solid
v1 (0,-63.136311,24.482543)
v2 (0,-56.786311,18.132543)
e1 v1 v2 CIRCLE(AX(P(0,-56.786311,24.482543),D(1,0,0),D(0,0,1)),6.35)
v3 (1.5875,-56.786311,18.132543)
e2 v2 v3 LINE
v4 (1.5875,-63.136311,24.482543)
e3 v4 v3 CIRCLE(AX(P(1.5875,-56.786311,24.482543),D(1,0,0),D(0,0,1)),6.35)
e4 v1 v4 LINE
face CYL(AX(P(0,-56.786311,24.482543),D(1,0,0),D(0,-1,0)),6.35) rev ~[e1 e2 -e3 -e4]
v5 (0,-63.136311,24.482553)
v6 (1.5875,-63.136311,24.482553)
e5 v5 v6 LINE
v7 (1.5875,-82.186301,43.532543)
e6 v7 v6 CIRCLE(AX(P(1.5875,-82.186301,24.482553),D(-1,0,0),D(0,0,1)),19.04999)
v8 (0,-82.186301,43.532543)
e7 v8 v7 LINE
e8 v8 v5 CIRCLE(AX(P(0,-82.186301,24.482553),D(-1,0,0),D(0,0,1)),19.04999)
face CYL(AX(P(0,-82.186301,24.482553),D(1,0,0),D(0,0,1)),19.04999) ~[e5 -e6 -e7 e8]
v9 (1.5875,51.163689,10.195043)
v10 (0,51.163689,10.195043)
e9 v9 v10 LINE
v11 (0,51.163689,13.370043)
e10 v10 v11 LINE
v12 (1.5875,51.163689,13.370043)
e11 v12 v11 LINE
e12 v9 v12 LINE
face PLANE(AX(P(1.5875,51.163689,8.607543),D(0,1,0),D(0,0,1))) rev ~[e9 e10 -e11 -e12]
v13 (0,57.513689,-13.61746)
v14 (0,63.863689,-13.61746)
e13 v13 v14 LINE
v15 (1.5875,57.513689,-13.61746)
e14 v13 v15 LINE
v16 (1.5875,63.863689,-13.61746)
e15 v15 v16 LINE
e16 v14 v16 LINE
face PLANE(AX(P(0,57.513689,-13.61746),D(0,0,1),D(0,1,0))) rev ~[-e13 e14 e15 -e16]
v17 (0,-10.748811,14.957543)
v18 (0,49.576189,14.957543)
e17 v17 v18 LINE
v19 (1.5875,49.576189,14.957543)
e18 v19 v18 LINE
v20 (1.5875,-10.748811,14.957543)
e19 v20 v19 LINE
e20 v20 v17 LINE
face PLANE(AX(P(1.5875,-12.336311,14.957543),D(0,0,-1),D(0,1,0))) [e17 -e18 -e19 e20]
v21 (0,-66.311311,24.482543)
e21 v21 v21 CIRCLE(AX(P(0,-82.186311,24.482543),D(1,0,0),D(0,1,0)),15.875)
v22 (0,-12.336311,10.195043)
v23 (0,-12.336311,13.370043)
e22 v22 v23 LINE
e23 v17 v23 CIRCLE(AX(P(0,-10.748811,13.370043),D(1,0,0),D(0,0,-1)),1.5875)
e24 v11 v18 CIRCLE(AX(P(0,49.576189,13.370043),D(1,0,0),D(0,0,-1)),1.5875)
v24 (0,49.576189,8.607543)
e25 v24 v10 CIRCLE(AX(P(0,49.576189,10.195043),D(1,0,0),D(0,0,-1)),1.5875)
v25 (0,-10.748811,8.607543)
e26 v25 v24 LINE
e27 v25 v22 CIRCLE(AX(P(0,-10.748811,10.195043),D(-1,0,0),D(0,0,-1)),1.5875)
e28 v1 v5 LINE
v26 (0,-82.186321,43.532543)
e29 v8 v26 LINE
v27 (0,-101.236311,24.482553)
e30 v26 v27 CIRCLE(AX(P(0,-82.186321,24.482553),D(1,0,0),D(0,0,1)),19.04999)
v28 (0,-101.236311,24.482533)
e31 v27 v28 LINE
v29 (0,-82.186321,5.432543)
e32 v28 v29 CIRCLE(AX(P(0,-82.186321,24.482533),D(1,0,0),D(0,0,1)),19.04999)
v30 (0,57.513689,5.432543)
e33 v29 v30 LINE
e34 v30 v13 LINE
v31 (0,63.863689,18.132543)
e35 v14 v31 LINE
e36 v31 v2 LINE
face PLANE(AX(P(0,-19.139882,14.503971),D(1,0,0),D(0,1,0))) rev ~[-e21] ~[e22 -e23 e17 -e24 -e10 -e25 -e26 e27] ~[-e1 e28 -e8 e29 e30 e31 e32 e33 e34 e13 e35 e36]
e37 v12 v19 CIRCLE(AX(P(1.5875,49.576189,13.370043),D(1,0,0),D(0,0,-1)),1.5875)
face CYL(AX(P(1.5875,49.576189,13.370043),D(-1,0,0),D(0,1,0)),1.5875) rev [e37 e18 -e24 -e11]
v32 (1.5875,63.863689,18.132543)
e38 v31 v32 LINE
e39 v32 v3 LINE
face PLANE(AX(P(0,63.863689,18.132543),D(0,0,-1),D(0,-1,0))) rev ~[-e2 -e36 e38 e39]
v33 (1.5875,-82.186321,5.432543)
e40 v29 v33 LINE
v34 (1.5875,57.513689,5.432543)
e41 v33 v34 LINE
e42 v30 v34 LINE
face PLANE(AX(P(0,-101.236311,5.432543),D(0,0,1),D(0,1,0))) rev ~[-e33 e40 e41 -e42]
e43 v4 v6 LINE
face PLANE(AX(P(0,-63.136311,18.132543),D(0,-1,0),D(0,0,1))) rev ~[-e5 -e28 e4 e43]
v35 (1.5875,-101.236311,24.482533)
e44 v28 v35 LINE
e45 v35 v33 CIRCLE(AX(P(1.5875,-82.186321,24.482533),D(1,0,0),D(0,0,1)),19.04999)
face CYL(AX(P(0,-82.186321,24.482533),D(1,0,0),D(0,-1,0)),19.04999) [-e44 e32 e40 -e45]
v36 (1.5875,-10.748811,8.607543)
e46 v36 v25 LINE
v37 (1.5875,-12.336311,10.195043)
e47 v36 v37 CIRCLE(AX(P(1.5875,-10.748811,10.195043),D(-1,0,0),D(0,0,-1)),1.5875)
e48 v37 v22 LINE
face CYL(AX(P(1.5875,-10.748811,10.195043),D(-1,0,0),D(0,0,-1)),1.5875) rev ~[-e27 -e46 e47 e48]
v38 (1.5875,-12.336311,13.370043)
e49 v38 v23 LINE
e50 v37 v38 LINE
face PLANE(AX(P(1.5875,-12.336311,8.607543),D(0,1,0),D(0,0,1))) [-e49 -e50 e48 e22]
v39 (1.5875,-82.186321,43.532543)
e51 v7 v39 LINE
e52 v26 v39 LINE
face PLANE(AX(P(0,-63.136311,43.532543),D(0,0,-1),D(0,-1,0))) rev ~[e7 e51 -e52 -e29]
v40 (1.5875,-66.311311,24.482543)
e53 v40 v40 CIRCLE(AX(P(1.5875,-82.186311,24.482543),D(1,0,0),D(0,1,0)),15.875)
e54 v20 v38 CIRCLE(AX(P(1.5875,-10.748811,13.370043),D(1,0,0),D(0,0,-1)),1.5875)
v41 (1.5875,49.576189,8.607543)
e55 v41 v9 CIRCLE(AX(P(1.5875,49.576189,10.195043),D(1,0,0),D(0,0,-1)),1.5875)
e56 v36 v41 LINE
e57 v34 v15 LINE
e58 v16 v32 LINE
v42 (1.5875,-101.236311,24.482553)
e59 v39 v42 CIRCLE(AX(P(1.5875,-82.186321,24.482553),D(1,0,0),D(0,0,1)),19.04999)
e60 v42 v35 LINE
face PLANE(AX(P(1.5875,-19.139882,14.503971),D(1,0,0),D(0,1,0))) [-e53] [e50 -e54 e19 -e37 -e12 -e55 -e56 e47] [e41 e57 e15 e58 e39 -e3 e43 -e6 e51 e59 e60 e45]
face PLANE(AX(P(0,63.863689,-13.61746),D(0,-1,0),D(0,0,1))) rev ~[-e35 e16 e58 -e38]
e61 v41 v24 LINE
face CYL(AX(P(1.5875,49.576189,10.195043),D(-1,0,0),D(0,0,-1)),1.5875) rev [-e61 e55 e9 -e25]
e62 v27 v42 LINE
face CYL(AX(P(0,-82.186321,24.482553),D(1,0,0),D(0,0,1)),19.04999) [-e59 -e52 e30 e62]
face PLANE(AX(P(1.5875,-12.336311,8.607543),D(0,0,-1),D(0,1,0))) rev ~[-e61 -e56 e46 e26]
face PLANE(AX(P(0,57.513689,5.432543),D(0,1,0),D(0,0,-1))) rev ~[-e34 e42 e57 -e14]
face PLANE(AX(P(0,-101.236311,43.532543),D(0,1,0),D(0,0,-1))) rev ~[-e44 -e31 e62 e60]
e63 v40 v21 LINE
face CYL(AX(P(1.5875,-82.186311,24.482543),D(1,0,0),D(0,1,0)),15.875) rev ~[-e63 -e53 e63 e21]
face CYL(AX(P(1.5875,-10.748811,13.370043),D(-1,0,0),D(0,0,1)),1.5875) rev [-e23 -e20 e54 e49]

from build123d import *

# Parameters (mm, degrees)
F1_DEPTH = 1.5875
F2_R     = 19.04999
F3_R     = 6.35
F4_R     = 15.875
F5_DEPTH = 25.4
F6_W     = 63.5
F6_H     = 6.35
F7_DEPTH = 25.4
F8_R     = 1.5875


# Not quite as in the source:
# - a fillet or chamfer is up to 0.001 mm smaller than in the source, because OpenCascade refuses the exact size


with BuildPart() as f1:
    # F0 (on Right) → F1 (new body)
    with BuildSketch(Plane.YZ):
        Polygon((-63.1363113923, 43.5325428513), (-101.2363113923, 43.5325428513), (-101.2363113923, 5.4325428513), (57.5136886077, 5.4325428513), (57.5136886077, -13.6174602094), (63.8636886077, -13.6174602094), (63.8636886077, 18.1325428513), (-63.1363113923, 18.1325428513), align=None)
    extrude(amount=F1_DEPTH)

    # F2 (radius 19.05 in the source; OpenCascade refuses exactly that, so slightly less here)
    f2_edges = [f1.edges().sort_by_distance(p)[0] for p in [
        (0.79375, -63.136311, 43.532543),
        (0.79375, -101.236311, 43.532543),
        (0.79375, -101.236311, 5.432543),
    ]]
    fillet(f2_edges, radius=F2_R)

    # F3
    f3_edges = [f1.edges().sort_by_distance(p)[0] for p in [
        (0.79375, -63.136311, 18.132543),
    ]]
    fillet(f3_edges, radius=F3_R)

    # F4 (on face) → F5 (cut)
    with BuildSketch(Plane.YZ.offset(1.5875)):
        with Locations((-82.1863113923, 24.4825428513)):
            Circle(F4_R)
    extrude(amount=-F5_DEPTH, mode=Mode.SUBTRACT)

    # F6 (on face) → F7 (cut)
    with BuildSketch(Plane.YZ.offset(1.5875)):
        with Locations((19.4136886077, 11.7825428513)):
            Rectangle(F6_W, F6_H)
    extrude(amount=-F7_DEPTH, mode=Mode.SUBTRACT)

    # F8
    f8_edges = [f1.edges().sort_by_distance(p)[0] for p in [
        (0.79375, -12.336311, 14.957543),
        (0.79375, -12.336311, 8.607543),
        (0.79375, 51.163689, 8.607543),
        (0.79375, 51.163689, 14.957543),
    ]]
    fillet(f8_edges, radius=F8_R)


solid = f1.part
